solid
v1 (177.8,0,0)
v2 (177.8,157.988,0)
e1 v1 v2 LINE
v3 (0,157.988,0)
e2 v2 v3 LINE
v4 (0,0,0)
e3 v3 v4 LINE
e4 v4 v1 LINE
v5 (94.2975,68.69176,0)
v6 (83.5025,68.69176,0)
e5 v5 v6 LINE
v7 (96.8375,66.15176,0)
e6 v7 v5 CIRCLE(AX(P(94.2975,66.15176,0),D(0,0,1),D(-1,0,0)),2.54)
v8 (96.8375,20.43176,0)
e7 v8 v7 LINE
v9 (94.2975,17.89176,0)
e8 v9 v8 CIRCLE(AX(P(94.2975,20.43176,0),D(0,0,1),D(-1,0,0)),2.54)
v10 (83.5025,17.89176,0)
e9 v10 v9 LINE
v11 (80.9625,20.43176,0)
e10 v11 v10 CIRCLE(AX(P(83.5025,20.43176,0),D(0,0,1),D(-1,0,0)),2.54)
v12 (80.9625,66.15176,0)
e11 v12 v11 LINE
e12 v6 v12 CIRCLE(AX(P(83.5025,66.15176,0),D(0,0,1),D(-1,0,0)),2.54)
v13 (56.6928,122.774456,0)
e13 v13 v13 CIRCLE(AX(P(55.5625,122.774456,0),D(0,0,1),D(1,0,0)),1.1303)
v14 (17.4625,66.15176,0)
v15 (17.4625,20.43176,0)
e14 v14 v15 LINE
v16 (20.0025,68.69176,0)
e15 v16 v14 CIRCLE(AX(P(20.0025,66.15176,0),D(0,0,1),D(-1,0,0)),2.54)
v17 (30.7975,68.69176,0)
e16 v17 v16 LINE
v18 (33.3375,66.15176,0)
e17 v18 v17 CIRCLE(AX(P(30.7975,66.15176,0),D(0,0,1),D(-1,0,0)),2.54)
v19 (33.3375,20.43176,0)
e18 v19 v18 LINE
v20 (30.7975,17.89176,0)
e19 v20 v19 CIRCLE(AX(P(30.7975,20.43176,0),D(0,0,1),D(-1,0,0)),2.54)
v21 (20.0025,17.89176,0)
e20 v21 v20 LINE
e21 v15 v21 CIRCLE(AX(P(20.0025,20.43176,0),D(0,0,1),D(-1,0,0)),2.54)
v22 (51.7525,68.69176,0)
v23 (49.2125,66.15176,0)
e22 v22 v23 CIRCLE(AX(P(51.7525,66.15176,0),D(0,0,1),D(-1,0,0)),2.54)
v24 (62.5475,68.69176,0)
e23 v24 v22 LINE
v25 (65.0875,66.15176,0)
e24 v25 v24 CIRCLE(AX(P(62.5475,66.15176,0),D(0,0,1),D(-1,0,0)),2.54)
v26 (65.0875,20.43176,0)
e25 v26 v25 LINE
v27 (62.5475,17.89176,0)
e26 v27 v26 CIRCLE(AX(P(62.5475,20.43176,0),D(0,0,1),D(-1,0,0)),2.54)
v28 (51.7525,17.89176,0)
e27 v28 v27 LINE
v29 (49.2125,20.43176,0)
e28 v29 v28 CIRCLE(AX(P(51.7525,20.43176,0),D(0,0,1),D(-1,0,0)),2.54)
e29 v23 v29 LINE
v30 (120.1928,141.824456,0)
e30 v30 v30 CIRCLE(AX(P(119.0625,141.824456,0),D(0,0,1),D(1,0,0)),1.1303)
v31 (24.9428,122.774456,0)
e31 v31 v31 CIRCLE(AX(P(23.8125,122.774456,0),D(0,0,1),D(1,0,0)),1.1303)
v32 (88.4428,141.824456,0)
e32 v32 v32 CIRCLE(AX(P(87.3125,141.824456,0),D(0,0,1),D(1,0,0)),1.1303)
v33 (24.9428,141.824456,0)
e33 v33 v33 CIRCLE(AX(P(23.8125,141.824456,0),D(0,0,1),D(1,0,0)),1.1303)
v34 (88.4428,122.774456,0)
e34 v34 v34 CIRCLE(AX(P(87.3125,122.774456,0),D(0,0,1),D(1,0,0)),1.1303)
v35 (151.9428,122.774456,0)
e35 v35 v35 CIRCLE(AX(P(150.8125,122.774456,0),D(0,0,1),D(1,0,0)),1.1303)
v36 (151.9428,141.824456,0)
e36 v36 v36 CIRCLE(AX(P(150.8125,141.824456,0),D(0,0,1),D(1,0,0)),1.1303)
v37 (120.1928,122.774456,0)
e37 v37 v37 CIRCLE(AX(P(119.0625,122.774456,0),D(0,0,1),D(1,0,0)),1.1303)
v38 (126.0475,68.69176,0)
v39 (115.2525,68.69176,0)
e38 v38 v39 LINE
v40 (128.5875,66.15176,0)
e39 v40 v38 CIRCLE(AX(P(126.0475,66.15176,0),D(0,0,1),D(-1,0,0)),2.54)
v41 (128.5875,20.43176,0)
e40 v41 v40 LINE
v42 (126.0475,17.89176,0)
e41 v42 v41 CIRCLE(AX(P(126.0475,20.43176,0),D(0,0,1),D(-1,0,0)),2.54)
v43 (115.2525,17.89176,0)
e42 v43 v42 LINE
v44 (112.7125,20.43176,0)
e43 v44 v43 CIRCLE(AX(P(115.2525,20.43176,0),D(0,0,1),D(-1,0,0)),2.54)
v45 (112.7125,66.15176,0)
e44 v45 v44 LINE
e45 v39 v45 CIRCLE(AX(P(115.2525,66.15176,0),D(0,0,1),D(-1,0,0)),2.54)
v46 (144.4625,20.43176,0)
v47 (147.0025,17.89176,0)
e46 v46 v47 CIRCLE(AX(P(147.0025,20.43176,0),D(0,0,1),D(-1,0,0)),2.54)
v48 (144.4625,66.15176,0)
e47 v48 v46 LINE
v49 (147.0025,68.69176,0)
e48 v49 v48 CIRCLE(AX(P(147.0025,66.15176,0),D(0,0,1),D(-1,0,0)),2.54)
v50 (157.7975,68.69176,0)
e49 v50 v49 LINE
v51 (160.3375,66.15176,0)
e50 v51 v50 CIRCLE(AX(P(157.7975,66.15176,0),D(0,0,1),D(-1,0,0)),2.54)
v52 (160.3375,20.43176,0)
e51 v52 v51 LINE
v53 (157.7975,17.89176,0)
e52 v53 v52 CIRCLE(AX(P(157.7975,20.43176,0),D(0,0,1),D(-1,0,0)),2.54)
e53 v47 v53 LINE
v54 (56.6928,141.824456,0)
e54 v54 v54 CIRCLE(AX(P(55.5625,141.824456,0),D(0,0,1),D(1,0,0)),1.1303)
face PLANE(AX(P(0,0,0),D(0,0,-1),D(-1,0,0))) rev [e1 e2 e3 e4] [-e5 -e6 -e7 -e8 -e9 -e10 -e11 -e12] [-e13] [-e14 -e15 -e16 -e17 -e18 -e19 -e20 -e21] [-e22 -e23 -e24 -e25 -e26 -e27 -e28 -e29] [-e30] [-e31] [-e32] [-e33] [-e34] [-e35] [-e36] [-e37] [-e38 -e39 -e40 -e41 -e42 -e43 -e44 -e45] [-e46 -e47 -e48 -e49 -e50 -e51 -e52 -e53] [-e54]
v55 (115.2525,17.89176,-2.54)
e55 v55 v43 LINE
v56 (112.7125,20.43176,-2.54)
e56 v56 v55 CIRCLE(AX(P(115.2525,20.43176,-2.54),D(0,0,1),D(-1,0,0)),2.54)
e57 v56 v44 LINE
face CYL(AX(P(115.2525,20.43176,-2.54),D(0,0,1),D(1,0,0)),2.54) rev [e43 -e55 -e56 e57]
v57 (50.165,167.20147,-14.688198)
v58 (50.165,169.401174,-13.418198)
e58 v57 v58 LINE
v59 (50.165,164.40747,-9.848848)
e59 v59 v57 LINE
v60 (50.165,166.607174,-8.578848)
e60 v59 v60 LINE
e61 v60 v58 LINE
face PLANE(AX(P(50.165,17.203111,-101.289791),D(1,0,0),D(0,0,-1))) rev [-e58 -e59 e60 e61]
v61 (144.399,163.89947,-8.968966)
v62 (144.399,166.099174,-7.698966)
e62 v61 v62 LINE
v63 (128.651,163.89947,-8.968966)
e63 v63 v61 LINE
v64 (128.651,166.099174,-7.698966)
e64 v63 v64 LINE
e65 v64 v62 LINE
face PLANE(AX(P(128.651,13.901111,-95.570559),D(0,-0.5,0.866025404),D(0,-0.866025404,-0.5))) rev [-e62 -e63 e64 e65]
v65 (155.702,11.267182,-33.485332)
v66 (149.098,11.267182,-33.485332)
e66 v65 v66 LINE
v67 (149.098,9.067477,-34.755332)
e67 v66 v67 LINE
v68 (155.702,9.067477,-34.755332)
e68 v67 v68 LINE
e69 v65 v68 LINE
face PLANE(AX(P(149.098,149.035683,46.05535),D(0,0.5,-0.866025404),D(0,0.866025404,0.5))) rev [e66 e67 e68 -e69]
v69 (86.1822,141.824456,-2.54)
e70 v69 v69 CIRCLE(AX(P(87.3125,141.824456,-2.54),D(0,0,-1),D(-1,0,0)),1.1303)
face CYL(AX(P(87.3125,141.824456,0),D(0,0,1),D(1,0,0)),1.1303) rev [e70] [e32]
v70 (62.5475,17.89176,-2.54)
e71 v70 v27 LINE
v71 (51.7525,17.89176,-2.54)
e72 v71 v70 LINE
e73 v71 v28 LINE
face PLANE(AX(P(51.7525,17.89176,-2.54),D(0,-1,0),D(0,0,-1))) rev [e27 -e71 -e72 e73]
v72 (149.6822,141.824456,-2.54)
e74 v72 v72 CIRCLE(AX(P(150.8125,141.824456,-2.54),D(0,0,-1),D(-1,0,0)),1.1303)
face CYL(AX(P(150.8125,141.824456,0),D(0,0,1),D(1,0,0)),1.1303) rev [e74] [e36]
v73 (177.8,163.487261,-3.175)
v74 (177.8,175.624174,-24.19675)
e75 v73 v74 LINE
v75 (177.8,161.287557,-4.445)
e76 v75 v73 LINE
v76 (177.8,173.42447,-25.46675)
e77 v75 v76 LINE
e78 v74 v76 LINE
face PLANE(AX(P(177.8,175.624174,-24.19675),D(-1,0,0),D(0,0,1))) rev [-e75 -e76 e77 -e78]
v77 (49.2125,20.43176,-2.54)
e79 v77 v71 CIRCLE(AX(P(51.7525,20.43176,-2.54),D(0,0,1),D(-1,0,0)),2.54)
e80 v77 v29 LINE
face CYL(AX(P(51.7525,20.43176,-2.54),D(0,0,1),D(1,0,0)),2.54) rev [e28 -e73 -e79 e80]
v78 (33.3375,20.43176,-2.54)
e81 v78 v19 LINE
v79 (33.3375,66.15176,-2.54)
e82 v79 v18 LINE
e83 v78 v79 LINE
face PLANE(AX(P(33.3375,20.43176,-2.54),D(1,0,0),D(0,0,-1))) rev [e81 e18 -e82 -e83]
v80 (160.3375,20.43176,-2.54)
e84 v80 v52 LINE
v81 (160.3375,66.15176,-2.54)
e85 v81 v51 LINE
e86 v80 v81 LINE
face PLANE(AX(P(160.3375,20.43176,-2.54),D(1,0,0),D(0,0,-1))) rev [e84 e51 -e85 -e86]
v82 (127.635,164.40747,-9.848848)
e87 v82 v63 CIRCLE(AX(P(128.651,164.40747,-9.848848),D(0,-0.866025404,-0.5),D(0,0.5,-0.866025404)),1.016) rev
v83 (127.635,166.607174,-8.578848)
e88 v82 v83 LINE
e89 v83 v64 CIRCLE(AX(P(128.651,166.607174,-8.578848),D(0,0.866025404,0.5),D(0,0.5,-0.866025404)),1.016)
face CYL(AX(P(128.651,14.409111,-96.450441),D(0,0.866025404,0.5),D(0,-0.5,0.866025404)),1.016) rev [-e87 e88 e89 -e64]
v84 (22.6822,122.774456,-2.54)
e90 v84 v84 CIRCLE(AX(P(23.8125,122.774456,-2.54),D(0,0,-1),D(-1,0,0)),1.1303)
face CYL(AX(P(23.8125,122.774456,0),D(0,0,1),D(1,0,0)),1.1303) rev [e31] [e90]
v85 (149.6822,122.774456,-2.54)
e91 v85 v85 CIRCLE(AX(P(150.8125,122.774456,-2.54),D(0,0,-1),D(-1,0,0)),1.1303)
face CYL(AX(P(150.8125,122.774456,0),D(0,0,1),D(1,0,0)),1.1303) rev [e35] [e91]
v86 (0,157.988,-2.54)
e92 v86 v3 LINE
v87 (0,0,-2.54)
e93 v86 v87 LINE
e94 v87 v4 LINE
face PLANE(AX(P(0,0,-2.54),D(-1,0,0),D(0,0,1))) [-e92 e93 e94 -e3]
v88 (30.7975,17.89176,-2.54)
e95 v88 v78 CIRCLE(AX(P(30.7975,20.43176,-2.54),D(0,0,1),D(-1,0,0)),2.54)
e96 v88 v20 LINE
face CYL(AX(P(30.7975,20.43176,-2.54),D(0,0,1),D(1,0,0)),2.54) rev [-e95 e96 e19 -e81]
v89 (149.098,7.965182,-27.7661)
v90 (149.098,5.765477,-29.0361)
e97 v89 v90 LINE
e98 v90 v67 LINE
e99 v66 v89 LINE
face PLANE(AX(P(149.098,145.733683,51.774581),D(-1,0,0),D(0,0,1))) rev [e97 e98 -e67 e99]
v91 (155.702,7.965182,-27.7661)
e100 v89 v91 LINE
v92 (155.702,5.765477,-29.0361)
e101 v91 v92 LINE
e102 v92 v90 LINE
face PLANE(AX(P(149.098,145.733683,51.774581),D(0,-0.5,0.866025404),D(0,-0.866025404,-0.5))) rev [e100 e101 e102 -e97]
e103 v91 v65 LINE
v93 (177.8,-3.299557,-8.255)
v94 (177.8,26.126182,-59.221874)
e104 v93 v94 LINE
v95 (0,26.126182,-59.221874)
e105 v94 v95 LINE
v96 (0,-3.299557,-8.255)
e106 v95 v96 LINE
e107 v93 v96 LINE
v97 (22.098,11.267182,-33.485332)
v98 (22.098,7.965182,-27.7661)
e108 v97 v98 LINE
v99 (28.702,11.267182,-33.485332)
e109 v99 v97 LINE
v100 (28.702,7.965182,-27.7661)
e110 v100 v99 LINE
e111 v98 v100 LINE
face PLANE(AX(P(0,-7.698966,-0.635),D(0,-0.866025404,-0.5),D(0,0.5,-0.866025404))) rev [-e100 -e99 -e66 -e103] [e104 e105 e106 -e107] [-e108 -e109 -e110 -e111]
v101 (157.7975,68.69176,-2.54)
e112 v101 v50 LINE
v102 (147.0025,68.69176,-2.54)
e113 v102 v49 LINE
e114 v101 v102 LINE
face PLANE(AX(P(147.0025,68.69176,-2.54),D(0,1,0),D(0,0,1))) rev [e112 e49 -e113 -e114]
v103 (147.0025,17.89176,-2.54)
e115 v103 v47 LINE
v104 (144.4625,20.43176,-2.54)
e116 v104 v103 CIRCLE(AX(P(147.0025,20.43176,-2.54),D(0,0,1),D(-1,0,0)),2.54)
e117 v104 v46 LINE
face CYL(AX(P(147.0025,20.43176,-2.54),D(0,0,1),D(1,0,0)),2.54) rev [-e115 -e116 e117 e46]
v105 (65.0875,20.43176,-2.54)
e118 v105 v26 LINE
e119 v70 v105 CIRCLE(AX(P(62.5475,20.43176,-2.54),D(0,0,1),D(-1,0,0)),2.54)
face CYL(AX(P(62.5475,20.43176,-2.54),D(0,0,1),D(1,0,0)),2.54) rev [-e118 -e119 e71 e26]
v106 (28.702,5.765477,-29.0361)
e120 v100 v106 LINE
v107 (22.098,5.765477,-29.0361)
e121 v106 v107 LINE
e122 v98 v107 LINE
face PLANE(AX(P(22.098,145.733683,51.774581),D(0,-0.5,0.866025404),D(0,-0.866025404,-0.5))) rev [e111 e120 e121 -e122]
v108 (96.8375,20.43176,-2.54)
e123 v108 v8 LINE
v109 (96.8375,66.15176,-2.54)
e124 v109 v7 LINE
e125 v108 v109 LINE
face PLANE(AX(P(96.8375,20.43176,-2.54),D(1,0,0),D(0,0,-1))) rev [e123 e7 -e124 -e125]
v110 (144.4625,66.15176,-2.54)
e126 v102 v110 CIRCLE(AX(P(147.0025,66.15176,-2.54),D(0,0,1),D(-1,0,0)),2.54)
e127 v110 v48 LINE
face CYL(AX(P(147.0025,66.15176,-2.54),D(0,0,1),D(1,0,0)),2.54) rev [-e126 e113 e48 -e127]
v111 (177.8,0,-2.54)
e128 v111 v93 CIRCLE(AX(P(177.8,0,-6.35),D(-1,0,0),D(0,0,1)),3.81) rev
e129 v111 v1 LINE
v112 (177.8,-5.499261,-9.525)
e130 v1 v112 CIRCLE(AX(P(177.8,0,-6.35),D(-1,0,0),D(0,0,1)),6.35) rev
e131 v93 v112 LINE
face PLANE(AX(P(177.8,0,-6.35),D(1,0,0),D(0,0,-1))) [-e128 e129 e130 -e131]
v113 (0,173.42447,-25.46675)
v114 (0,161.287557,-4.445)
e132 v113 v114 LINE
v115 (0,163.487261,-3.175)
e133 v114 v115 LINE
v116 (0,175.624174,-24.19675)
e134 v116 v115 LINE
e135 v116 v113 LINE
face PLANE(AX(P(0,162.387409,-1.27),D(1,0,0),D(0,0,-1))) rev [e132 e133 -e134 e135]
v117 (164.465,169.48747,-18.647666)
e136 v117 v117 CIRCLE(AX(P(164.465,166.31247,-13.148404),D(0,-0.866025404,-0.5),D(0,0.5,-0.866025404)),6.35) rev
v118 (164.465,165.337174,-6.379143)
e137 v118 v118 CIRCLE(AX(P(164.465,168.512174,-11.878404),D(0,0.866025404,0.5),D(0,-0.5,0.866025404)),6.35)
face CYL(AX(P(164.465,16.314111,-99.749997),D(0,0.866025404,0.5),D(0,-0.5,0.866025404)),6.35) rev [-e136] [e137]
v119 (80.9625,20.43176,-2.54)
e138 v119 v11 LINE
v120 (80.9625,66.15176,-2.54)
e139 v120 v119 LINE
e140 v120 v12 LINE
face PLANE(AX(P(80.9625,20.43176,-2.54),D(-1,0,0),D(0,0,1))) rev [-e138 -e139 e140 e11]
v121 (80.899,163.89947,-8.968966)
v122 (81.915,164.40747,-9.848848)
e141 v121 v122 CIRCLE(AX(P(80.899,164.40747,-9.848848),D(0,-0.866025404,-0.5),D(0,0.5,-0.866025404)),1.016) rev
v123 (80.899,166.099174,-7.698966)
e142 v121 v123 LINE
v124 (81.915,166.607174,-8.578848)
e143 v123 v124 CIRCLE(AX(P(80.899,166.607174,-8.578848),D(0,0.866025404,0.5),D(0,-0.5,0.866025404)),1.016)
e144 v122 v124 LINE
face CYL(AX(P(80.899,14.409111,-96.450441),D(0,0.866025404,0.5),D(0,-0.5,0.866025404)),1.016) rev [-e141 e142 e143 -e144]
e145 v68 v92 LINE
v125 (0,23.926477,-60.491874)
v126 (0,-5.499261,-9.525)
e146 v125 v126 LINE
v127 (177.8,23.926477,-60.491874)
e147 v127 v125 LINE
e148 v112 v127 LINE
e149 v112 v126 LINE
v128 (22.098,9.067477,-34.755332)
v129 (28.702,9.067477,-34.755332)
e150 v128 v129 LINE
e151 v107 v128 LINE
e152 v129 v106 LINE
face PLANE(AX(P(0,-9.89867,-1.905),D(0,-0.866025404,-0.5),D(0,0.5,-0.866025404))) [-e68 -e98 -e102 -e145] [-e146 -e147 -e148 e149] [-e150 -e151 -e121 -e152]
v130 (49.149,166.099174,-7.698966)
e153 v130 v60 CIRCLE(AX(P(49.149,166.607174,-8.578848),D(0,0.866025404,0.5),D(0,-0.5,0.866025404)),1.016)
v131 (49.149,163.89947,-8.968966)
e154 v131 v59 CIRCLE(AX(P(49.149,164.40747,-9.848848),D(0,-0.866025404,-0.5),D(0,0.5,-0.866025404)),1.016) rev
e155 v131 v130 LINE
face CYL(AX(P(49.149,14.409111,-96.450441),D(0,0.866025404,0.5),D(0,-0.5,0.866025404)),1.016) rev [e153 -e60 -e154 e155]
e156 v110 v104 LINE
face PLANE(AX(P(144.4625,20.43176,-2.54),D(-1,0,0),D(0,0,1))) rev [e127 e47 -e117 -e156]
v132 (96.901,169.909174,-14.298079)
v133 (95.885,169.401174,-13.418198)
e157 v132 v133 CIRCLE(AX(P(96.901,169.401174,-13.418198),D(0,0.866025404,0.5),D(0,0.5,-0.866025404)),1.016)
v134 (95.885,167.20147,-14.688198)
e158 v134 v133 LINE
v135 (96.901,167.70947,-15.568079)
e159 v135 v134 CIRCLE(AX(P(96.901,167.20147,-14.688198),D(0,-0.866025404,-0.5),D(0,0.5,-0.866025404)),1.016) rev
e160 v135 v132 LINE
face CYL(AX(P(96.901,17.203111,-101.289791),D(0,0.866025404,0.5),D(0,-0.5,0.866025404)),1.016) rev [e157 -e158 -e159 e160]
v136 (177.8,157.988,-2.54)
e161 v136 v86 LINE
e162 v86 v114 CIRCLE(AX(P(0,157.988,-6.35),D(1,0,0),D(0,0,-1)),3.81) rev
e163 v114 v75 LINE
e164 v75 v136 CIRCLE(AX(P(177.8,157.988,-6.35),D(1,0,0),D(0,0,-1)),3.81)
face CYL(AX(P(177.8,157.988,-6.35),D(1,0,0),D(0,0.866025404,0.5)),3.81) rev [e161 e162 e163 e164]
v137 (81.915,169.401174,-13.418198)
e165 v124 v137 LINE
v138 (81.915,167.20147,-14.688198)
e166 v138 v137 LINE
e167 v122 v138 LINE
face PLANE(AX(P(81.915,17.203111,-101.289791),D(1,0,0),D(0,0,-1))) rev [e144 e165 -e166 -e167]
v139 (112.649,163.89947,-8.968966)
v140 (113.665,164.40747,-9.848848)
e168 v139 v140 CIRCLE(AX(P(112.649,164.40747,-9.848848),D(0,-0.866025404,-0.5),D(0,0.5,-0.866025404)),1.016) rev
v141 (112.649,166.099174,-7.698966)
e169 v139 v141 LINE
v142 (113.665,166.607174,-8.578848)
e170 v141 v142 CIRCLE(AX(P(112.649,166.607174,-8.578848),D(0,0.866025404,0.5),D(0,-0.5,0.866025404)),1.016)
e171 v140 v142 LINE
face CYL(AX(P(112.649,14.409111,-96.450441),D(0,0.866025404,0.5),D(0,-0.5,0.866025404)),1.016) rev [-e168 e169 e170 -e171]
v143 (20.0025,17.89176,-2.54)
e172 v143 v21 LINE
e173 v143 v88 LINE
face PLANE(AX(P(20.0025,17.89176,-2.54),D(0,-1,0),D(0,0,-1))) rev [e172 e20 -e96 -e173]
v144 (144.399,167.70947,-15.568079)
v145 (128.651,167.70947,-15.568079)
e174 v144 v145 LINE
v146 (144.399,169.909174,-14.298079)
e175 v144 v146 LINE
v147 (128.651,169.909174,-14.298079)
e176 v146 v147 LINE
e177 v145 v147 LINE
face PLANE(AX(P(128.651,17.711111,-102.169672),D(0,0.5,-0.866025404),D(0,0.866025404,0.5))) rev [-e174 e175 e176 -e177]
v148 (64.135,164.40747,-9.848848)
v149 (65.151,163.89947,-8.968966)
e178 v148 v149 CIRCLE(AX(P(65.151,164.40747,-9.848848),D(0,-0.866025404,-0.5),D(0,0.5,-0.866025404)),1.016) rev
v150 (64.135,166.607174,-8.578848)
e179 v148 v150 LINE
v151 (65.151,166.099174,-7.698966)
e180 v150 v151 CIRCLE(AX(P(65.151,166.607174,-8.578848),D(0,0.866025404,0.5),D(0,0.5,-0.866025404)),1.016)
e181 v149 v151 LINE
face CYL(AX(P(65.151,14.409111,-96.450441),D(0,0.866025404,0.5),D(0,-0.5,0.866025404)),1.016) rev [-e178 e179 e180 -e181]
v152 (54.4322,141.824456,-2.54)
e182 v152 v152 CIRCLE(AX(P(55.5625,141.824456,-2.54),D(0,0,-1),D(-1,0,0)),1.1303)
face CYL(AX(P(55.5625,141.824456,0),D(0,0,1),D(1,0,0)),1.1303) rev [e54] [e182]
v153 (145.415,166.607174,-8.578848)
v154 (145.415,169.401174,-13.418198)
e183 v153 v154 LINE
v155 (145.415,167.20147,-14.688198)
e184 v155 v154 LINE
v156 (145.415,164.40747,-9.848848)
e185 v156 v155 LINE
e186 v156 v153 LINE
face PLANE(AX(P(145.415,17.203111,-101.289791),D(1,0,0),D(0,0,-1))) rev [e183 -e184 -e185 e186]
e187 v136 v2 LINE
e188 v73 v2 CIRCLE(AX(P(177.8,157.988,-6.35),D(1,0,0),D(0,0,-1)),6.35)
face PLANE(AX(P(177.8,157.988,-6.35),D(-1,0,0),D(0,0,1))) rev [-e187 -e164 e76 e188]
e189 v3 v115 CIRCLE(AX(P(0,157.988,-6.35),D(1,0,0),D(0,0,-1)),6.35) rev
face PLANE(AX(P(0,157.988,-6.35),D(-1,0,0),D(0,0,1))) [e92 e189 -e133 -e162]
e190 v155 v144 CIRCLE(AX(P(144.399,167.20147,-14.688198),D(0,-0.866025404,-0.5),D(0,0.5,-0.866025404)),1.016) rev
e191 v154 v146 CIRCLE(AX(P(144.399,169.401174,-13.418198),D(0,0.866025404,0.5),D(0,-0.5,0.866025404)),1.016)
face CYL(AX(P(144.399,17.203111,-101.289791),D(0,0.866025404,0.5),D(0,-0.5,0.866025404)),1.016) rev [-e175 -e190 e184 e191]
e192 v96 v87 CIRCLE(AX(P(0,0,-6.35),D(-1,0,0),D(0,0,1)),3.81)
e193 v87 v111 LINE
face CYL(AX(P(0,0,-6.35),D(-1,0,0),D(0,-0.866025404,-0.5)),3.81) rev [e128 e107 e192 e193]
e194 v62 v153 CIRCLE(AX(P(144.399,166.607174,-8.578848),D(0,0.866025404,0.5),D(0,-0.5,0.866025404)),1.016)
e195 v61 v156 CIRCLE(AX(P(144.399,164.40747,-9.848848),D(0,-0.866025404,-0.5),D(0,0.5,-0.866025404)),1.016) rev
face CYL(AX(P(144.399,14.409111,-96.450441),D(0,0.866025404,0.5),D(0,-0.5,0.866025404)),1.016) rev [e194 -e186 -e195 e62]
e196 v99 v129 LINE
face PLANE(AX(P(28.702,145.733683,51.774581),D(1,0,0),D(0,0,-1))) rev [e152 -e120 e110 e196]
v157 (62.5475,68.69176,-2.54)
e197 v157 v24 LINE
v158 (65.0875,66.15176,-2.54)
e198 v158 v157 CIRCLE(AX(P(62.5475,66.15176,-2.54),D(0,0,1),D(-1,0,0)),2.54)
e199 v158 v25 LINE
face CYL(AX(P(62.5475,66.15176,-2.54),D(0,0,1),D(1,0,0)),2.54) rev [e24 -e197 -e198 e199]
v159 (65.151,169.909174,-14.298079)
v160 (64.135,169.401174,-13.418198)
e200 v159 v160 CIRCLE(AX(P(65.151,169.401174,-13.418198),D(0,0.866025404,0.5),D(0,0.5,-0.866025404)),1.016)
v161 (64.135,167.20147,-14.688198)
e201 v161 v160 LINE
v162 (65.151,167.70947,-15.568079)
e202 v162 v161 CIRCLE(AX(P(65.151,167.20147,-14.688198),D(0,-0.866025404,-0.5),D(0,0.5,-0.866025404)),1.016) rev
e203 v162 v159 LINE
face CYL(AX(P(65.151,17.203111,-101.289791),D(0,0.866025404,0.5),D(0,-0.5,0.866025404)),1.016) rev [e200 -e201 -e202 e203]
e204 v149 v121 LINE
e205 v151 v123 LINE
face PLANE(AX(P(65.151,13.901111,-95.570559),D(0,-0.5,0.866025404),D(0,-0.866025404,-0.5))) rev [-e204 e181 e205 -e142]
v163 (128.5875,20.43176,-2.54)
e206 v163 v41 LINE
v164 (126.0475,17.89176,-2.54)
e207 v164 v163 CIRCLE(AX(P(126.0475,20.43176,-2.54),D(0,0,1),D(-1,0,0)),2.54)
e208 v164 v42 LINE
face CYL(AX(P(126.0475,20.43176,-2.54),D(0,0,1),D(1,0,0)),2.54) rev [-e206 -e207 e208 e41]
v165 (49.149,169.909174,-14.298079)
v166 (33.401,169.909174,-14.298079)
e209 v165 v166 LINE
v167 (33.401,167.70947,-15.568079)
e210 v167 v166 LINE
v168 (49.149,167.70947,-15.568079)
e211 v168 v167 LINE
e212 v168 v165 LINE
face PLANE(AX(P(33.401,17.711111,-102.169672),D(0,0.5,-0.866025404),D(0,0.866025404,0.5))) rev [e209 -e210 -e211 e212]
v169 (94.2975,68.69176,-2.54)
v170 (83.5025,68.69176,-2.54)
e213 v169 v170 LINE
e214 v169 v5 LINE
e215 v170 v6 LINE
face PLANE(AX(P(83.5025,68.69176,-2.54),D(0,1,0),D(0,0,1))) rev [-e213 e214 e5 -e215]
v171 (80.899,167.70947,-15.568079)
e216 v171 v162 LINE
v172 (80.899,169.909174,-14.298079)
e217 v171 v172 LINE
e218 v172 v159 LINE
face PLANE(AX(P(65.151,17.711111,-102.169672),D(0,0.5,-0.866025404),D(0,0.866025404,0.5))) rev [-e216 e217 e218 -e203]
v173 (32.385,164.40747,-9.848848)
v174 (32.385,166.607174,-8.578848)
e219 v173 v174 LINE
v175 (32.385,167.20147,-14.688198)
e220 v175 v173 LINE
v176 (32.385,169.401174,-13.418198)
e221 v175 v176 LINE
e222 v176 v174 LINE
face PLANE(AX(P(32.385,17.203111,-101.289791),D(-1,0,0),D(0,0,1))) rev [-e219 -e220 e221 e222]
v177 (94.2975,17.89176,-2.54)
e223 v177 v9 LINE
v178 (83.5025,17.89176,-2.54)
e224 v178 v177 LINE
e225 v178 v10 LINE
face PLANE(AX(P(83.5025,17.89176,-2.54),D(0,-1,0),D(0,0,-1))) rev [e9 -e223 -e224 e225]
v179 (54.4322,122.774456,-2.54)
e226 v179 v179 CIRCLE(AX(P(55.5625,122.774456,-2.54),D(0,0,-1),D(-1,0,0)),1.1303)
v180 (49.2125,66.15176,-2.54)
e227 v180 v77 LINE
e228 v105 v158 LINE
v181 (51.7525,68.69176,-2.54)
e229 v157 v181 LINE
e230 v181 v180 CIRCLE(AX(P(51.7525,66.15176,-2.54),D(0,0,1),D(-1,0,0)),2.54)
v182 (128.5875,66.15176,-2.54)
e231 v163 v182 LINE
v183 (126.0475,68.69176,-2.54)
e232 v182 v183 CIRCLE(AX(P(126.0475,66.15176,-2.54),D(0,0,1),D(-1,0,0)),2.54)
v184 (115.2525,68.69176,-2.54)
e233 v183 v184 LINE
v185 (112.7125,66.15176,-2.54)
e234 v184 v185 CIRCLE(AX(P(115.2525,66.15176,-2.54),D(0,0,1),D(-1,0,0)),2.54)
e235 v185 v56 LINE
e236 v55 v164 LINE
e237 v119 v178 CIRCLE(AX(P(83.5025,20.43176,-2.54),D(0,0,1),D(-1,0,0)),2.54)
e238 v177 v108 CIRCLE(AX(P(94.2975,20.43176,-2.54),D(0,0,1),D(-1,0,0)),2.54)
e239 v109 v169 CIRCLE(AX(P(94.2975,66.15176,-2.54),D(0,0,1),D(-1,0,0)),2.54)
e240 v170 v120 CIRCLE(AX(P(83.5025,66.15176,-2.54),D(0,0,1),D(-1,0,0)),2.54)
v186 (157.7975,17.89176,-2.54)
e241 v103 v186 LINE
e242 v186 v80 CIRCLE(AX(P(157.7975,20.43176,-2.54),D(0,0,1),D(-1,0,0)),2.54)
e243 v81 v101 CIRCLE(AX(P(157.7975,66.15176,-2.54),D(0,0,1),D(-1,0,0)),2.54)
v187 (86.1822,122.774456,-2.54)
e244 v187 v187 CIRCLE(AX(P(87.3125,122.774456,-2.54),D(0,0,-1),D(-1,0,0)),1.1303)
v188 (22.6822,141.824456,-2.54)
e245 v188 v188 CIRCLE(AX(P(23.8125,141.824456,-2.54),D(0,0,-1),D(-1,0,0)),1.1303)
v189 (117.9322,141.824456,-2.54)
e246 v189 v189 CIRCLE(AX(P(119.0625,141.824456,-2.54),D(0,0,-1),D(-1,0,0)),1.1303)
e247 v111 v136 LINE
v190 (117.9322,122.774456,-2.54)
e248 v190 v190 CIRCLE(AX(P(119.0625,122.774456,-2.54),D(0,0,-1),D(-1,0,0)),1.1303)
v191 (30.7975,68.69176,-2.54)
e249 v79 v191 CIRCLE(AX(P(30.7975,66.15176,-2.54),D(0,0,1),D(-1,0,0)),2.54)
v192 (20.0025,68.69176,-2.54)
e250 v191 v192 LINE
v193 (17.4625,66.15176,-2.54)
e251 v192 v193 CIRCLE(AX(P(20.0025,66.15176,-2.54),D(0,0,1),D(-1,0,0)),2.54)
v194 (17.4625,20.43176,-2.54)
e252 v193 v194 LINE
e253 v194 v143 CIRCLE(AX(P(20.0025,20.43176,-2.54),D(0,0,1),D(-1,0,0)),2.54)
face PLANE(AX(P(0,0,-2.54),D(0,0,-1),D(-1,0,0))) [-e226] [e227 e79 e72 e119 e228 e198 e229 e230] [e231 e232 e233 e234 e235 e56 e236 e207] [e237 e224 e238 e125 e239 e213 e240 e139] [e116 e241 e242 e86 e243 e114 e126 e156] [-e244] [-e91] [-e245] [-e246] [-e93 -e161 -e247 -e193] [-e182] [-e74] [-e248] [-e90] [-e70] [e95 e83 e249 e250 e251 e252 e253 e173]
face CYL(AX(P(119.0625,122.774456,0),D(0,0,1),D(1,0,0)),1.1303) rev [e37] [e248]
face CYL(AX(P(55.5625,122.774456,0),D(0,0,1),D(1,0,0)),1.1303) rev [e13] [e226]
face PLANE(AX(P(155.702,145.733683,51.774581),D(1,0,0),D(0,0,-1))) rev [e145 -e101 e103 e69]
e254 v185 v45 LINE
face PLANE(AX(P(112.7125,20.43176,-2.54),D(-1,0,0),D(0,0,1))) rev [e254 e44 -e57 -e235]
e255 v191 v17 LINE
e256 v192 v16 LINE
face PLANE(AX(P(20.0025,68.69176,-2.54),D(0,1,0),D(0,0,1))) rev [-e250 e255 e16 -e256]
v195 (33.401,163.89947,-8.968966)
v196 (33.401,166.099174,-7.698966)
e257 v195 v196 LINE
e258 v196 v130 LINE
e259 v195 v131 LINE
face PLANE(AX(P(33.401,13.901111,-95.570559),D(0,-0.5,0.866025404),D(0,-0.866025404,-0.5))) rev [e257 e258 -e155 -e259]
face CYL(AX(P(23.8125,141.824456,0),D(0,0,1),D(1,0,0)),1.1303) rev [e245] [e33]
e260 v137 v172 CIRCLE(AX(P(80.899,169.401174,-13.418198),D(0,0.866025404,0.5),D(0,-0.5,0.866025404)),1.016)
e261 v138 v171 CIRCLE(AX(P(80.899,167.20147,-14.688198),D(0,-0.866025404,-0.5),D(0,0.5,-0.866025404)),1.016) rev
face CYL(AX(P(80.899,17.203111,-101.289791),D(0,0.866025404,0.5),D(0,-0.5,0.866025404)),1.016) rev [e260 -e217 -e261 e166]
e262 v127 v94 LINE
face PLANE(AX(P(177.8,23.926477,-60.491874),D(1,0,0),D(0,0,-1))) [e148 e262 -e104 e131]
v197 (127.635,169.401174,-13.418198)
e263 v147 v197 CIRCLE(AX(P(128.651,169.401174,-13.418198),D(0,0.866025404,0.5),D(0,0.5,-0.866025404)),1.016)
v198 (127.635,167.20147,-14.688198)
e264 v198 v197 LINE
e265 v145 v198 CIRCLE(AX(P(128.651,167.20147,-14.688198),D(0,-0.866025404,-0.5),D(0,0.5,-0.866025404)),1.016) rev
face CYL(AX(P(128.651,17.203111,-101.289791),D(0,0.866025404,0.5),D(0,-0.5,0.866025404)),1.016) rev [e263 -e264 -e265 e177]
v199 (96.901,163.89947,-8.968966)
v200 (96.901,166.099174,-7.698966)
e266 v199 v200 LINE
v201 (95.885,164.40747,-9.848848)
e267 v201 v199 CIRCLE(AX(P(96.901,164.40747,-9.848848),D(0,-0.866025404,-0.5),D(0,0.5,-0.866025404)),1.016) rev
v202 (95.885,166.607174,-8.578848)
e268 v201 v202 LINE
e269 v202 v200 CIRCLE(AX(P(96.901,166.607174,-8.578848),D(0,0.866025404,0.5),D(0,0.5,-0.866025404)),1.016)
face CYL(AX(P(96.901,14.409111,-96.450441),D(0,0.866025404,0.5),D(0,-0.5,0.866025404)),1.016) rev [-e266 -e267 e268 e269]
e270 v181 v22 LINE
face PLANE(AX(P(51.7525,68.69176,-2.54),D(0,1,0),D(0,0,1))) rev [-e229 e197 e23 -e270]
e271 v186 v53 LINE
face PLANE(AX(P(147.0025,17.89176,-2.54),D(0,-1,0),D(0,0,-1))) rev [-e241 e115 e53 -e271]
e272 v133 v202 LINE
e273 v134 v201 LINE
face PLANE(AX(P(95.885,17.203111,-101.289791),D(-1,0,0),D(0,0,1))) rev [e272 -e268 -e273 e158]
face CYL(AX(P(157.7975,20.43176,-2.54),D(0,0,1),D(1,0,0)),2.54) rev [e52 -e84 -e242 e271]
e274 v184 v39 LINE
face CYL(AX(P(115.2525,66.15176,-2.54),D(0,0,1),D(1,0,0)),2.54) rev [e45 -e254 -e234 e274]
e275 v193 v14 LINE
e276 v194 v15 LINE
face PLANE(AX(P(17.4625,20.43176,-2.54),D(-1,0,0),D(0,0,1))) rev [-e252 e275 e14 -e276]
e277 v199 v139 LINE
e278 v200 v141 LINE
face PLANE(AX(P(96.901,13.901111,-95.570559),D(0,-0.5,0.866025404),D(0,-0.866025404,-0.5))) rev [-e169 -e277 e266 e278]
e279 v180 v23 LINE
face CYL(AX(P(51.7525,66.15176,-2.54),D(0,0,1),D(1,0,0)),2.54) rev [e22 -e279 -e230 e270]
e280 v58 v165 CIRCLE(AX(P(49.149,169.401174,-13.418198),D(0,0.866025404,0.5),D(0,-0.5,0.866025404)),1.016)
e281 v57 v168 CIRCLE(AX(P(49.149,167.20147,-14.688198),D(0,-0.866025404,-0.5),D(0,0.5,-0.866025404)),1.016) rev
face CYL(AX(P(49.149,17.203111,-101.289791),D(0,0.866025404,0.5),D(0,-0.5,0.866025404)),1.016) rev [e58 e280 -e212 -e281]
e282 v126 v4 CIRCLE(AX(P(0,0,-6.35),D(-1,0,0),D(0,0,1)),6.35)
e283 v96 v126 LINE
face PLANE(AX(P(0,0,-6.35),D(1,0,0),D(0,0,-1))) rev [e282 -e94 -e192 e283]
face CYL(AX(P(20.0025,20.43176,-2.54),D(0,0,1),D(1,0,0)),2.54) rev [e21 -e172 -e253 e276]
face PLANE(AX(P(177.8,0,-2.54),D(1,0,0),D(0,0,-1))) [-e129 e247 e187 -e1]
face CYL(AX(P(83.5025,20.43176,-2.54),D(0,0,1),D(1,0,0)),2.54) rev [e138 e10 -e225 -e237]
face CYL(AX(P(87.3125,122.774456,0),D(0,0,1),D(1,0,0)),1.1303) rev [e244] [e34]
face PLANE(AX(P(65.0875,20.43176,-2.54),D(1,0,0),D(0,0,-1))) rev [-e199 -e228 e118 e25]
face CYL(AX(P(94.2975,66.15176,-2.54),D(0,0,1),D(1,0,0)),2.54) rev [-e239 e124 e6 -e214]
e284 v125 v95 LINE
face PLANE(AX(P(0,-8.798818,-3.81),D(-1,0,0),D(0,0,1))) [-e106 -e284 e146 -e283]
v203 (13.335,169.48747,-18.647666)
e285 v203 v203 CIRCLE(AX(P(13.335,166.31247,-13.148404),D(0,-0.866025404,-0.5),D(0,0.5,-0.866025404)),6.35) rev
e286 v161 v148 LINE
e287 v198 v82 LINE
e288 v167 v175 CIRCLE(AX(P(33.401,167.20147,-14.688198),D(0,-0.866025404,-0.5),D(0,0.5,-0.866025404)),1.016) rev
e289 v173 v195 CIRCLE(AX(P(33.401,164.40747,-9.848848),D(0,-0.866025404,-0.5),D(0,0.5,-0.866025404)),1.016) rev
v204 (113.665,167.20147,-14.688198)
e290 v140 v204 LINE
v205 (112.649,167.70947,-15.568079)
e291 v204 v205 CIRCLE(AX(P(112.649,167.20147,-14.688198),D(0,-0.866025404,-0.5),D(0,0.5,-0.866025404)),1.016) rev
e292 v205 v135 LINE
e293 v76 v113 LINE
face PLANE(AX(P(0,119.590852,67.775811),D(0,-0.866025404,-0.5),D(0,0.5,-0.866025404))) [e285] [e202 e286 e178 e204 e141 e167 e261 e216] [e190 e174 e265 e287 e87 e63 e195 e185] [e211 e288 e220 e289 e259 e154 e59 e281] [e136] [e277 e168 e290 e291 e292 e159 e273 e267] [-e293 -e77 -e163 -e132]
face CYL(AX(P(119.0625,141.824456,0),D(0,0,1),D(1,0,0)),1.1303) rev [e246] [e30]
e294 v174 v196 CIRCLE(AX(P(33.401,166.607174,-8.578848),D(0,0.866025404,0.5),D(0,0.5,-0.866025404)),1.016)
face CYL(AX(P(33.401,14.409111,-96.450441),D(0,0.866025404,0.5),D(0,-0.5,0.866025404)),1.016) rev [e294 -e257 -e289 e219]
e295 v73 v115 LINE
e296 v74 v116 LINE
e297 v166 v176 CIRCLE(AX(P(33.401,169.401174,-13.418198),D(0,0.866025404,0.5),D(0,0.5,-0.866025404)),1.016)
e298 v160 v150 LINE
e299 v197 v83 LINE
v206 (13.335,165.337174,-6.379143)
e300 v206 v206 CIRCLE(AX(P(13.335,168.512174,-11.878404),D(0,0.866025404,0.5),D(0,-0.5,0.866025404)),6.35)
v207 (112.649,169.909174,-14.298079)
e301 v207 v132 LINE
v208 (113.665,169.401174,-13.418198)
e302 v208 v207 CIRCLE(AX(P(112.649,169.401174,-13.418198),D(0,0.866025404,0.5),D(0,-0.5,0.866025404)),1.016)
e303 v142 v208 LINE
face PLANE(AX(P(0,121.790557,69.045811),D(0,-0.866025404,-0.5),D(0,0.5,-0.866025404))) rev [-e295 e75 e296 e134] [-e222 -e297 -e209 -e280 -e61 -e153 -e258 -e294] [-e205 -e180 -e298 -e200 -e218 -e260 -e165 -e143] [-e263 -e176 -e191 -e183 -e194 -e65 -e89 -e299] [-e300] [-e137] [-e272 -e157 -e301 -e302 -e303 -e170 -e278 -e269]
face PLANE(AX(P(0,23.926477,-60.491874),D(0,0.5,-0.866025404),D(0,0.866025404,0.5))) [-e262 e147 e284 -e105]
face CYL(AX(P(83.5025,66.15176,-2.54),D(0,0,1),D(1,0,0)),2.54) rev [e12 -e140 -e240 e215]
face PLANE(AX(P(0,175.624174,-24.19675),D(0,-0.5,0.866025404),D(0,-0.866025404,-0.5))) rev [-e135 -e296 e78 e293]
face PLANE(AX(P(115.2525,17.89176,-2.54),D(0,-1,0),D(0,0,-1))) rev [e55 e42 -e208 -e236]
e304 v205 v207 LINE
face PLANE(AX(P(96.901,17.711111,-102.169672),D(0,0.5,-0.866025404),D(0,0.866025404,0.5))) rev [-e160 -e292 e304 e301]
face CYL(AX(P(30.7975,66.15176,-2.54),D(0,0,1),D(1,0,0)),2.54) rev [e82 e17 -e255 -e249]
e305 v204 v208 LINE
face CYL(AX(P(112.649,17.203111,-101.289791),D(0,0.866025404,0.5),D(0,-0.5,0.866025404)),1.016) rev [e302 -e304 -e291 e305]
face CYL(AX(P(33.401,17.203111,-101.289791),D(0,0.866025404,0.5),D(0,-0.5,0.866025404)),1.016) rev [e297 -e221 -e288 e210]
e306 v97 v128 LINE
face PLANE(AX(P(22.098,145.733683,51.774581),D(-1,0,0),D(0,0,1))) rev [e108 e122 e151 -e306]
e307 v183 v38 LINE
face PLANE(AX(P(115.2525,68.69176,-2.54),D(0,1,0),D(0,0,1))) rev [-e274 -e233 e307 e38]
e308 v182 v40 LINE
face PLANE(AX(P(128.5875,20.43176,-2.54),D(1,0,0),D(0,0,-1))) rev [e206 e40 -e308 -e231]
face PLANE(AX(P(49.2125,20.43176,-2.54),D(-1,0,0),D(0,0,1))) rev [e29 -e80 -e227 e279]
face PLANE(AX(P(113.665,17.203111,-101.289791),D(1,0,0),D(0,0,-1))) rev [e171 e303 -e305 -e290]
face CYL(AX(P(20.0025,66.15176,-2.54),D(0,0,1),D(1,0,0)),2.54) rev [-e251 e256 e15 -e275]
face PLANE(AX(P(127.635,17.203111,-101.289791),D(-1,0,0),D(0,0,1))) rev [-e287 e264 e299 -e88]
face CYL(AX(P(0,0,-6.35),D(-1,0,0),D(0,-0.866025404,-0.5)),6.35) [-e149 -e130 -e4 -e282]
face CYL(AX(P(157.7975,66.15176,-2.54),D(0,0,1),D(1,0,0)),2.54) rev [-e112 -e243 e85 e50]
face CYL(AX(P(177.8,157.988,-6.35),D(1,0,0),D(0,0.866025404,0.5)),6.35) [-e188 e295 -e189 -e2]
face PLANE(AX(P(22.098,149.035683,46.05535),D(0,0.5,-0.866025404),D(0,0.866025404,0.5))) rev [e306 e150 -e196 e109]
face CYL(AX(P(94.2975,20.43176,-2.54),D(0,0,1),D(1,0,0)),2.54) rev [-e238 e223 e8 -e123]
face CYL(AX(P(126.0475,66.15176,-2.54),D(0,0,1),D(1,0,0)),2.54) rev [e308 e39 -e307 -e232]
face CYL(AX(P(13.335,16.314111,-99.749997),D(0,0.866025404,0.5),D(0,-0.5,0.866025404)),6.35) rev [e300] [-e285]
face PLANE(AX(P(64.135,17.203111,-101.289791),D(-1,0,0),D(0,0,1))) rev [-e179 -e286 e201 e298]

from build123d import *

# Parameters (mm, degrees)
SKETCH1_W             = 177.8
SKETCH1_H             = 157.988
BASE_FLANGE1_DEPTH    = 2.54
CUT_EXTRUDE1_DEPTH    = 238.864456664
F_4_40_TAPPED_HOLE1_D = 2.2606
LPATTERN1_COUNT       = 5
LPATTERN1_PITCH       = 31.75
EDGE_FLANGE1_DEPTH    = 177.8
EDGE_FLANGE2_DEPTH    = 177.8
CUT_EXTRUDE4_REACH    = 256.794
LPATTERN2_COUNT       = 4
LPATTERN2_PITCH       = 31.75
CUT_EXTRUDE5_REACH    = 263.778
SKETCH28_W            = 6.604
SKETCH28_H            = 6.604
CUT_EXTRUDE3_REACH    = 256.794
SKETCH24_R            = 6.35


# Sheet-metal steps are written as plain solids
with BuildPart() as part:
    # Sketch1 → Base-Flange1 (new body)
    with BuildSketch(Plane.XY):
        with Locations((88.9, 78.994)):
            Rectangle(SKETCH1_W, SKETCH1_H)
    extrude(amount=-BASE_FLANGE1_DEPTH)

    # Sketch6 → Cut-Extrude1 (cut, through all)
    with BuildSketch(Plane.XY):
        with BuildLine():
            Line((20.0025, 17.89176), (30.7975, 17.89176))
            ThreePointArc((30.7975, 17.89176), (32.593551224, 18.635708776), (33.3375, 20.43176))
            Line((33.3375, 20.43176), (33.3375, 66.15176))
            ThreePointArc((33.3375, 66.15176), (32.593551224, 67.947811224), (30.7975, 68.69176))
            Line((30.7975, 68.69176), (20.0025, 68.69176))
            ThreePointArc((20.0025, 68.69176), (18.206448776, 67.947811224), (17.4625, 66.15176))
            Line((17.4625, 66.15176), (17.4625, 20.43176))
            ThreePointArc((17.4625, 20.43176), (18.206448776, 18.635708776), (20.0025, 17.89176))
        make_face()
    cut_extrude1 = extrude(amount=-CUT_EXTRUDE1_DEPTH, mode=Mode.SUBTRACT)

    # #4-40 Tapped Hole1 (through all)
    with Locations(Plane(origin=(23.8125, 141.824456, 0), x_dir=(1, 0, 0), z_dir=(0, 0, 1))):
        with Locations((0, 0), (0, -19.05)):
            f_4_40_tapped_hole1 = Hole(F_4_40_TAPPED_HOLE1_D / 2)

    # LPattern1: Cut-Extrude1, #4-40 Tapped Hole1 ×5
    with Locations(*[(i * LPATTERN1_PITCH, 0, 0) for i in range(1, LPATTERN1_COUNT)]):
        add(cut_extrude1, mode=Mode.SUBTRACT)
        add(f_4_40_tapped_hole1, mode=Mode.SUBTRACT)

    # Edge-Flange1 section (across the edge) → Edge-Flange1 (add)
    with BuildSketch(Plane(origin=(0, 160.187704526, -2.54), x_dir=(0, -0.8660254037844364, -0.5000000000000041), z_dir=(1, 0, 0))):
        with BuildLine():
            Line((-2.54, 2.199704526), (-2.54, 26.473530316))
            Line((-2.54, 26.473530316), (0, 26.473530316))
            Line((0, 26.473530316), (0, 2.199704526))
            ThreePointArc((0, 2.199704526), (0.510443212, 0.294704526), (1.905, -1.099852263))
            Line((1.905, -1.099852263), (0.635, -3.299556788))
            ThreePointArc((0.635, -3.299556788), (-1.689261314, -0.975295474), (-2.54, 2.199704526))
        make_face()
    extrude(amount=EDGE_FLANGE1_DEPTH)

    # Edge-Flange2 section (across the edge) → Edge-Flange2 (add)
    with BuildSketch(Plane(origin=(177.8, -6.599113577, -2.54), x_dir=(0, 0.8660254037844398, 0.499999999999998), z_dir=(-1, 0, 0))):
        with BuildLine():
            Line((-2.54, 6.599113577), (-2.54, 65.450590949))
            Line((-2.54, 65.450590949), (0, 65.450590949))
            Line((0, 65.450590949), (0, 6.599113577))
            ThreePointArc((0, 6.599113577), (1.905, 3.299556788), (5.715, 3.299556788))
            Line((5.715, 3.299556788), (6.985, 1.099852263))
            ThreePointArc((6.985, 1.099852263), (0.635, 1.099852263), (-2.54, 6.599113577))
        make_face()
    extrude(amount=EDGE_FLANGE2_DEPTH)

    # Sketch25 → Cut-Extrude4 (cut, up to next)
    with BuildSketch(Plane(origin=(0, 121.240630657, 69.998310747), x_dir=(1, 0, 0), z_dir=(0, 0.8660254037844362, 0.5000000000000044)), mode=Mode.PRIVATE) as cut_extrude4_sk1:
        with BuildLine():
            Line((33.401, 97.337087105), (49.149, 97.337087105))
            ThreePointArc((49.149, 97.337087105), (49.86742049, 97.039507594), (50.165, 96.321087105))
            Line((50.165, 96.321087105), (50.165, 90.733087105))
            ThreePointArc((50.165, 90.733087105), (49.86742049, 90.014666615), (49.149, 89.717087105))
            Line((49.149, 89.717087105), (33.401, 89.717087105))
            ThreePointArc((33.401, 89.717087105), (32.68257951, 90.014666615), (32.385, 90.733087105))
            Line((32.385, 90.733087105), (32.385, 96.321087105))
            ThreePointArc((32.385, 96.321087105), (32.68257951, 97.039507594), (33.401, 97.337087105))
        make_face()
    cut_extrude4_tool1 = extrude(cut_extrude4_sk1.sketch, amount=-CUT_EXTRUDE4_REACH, mode=Mode.PRIVATE) & part.part
    cut_extrude4 = cut_extrude4_tool1.solids().sort_by_distance((41.275, 168.004174, -10.998523))[0]
    add(cut_extrude4, mode=Mode.SUBTRACT)

    # LPattern2: Cut-Extrude4 ×4
    with Locations(*[(i * LPATTERN2_PITCH, 0, 0) for i in range(1, LPATTERN2_COUNT)]):
        add(cut_extrude4, mode=Mode.SUBTRACT)

    # Sketch28 → Cut-Extrude5 (cut, up to next)
    with BuildSketch(Plane(origin=(0, -8.248891971, -4.7625), x_dir=(1, 0, 0), z_dir=(0, -0.8660254037844399, -0.49999999999999806)), mode=Mode.PRIVATE) as cut_extrude5_sk1:
        with Locations((25.4, -31.330738686)):
            Rectangle(SKETCH28_W, SKETCH28_H)
    cut_extrude5_tool1 = extrude(cut_extrude5_sk1.sketch, amount=-CUT_EXTRUDE5_REACH, mode=Mode.PRIVATE) & part.part
    # Sketch28 → Cut-Extrude5 (cut, up to next)
    with BuildSketch(Plane(origin=(0, -8.248891971, -4.7625), x_dir=(1, 0, 0), z_dir=(0, -0.8660254037844399, -0.49999999999999806)), mode=Mode.PRIVATE) as cut_extrude5_sk2:
        with Locations((152.4, -31.330738686)):
            Rectangle(SKETCH28_W, SKETCH28_H)
    cut_extrude5_tool2 = extrude(cut_extrude5_sk2.sketch, amount=-CUT_EXTRUDE5_REACH, mode=Mode.PRIVATE) & part.part
    add(cut_extrude5_tool1.solids().sort_by_distance((25.4, 7.416477, -31.895716))[0], mode=Mode.SUBTRACT)
    add(cut_extrude5_tool2.solids().sort_by_distance((152.4, 7.416477, -31.895716))[0], mode=Mode.SUBTRACT)

    # Sketch24 → Cut-Extrude3 (cut, up to next)
    with BuildSketch(Plane(origin=(0, 121.240630657, 69.998310747), x_dir=(1, 0, 0), z_dir=(0, 0.8660254037844362, 0.5000000000000044)), mode=Mode.PRIVATE) as cut_extrude3_sk1:
        with Locations(Location((13.335, 94.543087105, 0), (0, 0, 270))):
            Circle(SKETCH24_R)
    cut_extrude3_tool1 = extrude(cut_extrude3_sk1.sketch, amount=-CUT_EXTRUDE3_REACH, mode=Mode.PRIVATE) & part.part
    # Sketch24 → Cut-Extrude3 (cut, up to next)
    with BuildSketch(Plane(origin=(0, 121.240630657, 69.998310747), x_dir=(1, 0, 0), z_dir=(0, 0.8660254037844362, 0.5000000000000044)), mode=Mode.PRIVATE) as cut_extrude3_sk2:
        with Locations(Location((164.465, 94.543087105, 0), (0, 0, 270))):
            Circle(SKETCH24_R)
    cut_extrude3_tool2 = extrude(cut_extrude3_sk2.sketch, amount=-CUT_EXTRUDE3_REACH, mode=Mode.PRIVATE) & part.part
    add(cut_extrude3_tool1.solids().sort_by_distance((13.335, 168.512174, -11.878404))[0], mode=Mode.SUBTRACT)
    add(cut_extrude3_tool2.solids().sort_by_distance((164.465, 168.512174, -11.878404))[0], mode=Mode.SUBTRACT)


solid = part.part
